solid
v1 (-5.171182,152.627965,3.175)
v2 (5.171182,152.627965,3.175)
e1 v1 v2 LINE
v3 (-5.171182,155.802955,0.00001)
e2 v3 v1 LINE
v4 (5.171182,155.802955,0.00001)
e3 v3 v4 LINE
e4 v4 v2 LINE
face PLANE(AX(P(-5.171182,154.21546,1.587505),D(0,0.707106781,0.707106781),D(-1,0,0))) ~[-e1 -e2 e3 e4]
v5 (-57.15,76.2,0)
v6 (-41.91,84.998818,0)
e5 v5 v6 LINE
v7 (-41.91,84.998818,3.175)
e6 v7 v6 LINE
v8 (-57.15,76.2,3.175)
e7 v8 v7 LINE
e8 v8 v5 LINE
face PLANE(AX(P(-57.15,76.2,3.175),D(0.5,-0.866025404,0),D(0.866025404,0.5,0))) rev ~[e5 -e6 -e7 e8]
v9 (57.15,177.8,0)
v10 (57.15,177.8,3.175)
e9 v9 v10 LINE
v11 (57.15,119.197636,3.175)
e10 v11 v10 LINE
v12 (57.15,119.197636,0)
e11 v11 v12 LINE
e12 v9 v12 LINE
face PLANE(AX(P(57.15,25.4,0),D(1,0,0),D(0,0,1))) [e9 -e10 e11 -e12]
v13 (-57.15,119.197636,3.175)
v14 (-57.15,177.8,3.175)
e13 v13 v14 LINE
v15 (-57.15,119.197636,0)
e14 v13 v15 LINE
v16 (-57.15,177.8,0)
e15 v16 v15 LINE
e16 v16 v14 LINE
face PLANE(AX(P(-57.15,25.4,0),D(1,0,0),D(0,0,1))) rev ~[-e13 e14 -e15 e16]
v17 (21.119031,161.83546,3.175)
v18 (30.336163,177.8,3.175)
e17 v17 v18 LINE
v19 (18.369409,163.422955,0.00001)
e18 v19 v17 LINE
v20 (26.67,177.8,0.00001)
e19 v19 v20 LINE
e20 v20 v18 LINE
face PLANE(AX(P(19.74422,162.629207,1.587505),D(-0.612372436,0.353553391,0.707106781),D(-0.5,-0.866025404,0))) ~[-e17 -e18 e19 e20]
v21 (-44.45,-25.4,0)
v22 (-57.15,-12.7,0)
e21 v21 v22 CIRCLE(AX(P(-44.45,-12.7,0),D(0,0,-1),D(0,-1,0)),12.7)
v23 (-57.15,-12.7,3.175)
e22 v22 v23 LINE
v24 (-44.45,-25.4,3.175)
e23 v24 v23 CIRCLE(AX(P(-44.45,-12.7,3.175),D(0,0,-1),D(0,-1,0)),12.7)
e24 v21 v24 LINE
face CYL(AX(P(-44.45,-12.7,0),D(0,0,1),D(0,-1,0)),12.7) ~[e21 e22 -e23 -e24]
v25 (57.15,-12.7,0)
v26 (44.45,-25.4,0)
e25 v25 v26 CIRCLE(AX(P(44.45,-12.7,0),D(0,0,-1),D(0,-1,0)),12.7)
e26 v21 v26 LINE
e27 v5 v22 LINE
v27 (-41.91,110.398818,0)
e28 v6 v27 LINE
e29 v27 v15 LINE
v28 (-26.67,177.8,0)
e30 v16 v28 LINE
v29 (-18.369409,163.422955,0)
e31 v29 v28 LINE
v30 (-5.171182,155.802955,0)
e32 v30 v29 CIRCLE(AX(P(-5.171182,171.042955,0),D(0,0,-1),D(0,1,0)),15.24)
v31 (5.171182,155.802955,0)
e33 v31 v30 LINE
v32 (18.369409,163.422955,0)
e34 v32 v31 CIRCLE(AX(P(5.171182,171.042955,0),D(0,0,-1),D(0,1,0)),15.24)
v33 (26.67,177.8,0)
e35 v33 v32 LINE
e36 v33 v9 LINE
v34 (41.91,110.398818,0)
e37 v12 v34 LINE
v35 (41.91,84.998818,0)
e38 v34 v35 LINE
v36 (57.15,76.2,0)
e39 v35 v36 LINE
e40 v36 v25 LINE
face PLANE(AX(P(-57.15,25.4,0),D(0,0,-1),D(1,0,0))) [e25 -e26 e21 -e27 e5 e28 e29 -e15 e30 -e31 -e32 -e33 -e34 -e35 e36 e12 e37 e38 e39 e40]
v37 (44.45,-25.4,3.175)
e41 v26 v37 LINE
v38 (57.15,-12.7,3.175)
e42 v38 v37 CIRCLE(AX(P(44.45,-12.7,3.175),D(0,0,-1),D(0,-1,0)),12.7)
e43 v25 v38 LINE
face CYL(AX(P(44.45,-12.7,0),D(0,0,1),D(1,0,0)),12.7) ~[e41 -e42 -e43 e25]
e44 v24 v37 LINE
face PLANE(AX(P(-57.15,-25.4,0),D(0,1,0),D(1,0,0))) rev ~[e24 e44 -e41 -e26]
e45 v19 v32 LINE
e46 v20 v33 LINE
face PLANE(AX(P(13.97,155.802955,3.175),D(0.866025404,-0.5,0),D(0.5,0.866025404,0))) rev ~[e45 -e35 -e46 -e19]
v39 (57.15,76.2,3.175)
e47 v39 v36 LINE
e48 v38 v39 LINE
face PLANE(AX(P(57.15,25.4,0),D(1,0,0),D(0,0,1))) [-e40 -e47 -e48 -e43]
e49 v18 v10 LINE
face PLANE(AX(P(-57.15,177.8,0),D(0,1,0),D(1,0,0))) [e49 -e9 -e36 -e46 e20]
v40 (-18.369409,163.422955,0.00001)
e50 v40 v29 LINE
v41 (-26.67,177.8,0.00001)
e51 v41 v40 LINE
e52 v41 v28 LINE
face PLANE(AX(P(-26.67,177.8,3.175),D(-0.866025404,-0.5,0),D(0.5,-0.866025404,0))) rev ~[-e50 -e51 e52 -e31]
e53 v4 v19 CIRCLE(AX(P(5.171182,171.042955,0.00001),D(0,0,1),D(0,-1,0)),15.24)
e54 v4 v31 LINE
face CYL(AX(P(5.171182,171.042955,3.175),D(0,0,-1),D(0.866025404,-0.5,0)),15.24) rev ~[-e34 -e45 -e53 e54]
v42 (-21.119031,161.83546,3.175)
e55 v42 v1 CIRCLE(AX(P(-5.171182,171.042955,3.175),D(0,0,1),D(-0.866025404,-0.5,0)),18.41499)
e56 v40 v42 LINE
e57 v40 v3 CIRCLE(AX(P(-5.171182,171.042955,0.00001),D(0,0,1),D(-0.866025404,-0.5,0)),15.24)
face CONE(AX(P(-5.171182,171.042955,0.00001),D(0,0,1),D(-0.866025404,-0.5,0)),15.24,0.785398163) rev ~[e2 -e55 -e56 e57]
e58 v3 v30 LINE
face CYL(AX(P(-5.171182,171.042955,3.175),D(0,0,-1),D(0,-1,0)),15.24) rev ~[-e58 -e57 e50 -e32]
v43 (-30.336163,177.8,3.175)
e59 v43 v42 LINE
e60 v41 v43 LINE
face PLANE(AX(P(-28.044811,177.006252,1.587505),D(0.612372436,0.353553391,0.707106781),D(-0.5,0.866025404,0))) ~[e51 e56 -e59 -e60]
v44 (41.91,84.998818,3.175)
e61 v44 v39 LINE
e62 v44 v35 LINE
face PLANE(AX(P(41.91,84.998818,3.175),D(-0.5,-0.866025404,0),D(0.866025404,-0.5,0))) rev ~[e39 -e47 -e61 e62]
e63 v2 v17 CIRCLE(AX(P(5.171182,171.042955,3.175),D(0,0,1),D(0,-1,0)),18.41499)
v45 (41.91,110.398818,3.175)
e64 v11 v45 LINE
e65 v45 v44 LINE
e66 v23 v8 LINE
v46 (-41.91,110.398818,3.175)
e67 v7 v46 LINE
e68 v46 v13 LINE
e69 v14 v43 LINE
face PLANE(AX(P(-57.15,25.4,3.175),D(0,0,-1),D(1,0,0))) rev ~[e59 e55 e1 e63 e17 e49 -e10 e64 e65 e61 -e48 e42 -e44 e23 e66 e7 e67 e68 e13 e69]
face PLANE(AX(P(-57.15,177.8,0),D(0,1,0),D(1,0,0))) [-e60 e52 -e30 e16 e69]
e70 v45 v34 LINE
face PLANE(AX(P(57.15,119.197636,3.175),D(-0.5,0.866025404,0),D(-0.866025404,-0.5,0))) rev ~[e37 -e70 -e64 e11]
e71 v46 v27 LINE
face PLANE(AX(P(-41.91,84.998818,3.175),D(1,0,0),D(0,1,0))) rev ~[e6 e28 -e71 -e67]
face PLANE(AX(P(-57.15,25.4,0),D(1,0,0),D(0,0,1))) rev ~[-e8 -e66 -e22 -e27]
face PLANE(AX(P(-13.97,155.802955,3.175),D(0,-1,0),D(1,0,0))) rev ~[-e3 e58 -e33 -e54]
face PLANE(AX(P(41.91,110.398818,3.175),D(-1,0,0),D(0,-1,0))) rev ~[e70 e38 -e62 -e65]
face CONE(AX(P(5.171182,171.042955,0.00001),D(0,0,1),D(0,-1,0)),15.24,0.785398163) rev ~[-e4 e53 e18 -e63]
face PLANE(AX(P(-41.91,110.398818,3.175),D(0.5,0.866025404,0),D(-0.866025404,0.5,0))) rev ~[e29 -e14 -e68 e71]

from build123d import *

# Parameters (mm, degrees)
F0_W     = 114.3
F0_H     = 50.8
F1_DEPTH = 3.175
F2_DEPTH = 152.4
F4_DEPTH = 3.302
F5_R     = 15.24
F6_R     = 12.7
F7_DEPTH = 3.175
F8_SIZE  = 3.17499


# Not quite as in the source:
# - a fillet or chamfer is up to 0.001 mm smaller than in the source, because OpenCascade refuses the exact size


with BuildPart() as f1:
    # F0 (on Top) → F1 (new body)
    with BuildSketch(Plane.XY):
        Rectangle(F0_W, F0_H)
    extrude(amount=F1_DEPTH)

    # F2 (add): a face of the model
    f2_faces = [f1.faces().sort_by_distance(p)[0] for p in [
        (0, 25.4, 1.5875),
    ]]
    extrude(f2_faces, amount=F2_DEPTH)

    # F3 (on face) → F4 (cut)
    with BuildSketch(Plane.XY.offset(3.175)):
        Polygon((-13.97, 155.8029547439), (13.97, 155.8029547439), (26.67, 177.8), (-26.67, 177.8), align=None)
    extrude(amount=-F4_DEPTH, mode=Mode.SUBTRACT)

    # F5
    f5_edges = [f1.edges().sort_by_distance(p)[0] for p in [
        (13.97, 155.802955, 1.5875),
        (-13.97, 155.802955, 1.5875),
    ]]
    fillet(f5_edges, radius=F5_R)

    # F6
    f6_edges = [f1.edges().sort_by_distance(p)[0] for p in [
        (57.15, -25.4, 1.5875),
        (-57.15, -25.4, 1.5875),
    ]]
    fillet(f6_edges, radius=F6_R)

    # F3 (on face) → F7 (cut)
    with BuildSketch(Plane.XY.offset(3.175)):
        Polygon((57.15, 76.2), (57.15, 119.1976362049), (41.91, 110.3988181024), (41.91, 84.9988181024), align=None)
        Polygon((-41.91, 110.3988181024), (-57.15, 119.1976362049), (-57.15, 76.2), (-41.91, 84.9988181024), align=None)
    extrude(amount=-F7_DEPTH, mode=Mode.SUBTRACT)

    # F8 (size 3.175 in the source; OpenCascade refuses exactly that, so slightly less here)
    f8_edges = [f1.edges().sort_by_distance(p)[0] for p in [
        (-22.519705, 170.611477, 3.175),
        (-12.791182, 157.844728, 3.175),
        (0, 155.802955, 3.175),
        (12.791182, 157.844728, 3.175),
        (22.519705, 170.611477, 3.175),
    ]]
    chamfer(f8_edges, length=F8_SIZE)


solid = f1.part
